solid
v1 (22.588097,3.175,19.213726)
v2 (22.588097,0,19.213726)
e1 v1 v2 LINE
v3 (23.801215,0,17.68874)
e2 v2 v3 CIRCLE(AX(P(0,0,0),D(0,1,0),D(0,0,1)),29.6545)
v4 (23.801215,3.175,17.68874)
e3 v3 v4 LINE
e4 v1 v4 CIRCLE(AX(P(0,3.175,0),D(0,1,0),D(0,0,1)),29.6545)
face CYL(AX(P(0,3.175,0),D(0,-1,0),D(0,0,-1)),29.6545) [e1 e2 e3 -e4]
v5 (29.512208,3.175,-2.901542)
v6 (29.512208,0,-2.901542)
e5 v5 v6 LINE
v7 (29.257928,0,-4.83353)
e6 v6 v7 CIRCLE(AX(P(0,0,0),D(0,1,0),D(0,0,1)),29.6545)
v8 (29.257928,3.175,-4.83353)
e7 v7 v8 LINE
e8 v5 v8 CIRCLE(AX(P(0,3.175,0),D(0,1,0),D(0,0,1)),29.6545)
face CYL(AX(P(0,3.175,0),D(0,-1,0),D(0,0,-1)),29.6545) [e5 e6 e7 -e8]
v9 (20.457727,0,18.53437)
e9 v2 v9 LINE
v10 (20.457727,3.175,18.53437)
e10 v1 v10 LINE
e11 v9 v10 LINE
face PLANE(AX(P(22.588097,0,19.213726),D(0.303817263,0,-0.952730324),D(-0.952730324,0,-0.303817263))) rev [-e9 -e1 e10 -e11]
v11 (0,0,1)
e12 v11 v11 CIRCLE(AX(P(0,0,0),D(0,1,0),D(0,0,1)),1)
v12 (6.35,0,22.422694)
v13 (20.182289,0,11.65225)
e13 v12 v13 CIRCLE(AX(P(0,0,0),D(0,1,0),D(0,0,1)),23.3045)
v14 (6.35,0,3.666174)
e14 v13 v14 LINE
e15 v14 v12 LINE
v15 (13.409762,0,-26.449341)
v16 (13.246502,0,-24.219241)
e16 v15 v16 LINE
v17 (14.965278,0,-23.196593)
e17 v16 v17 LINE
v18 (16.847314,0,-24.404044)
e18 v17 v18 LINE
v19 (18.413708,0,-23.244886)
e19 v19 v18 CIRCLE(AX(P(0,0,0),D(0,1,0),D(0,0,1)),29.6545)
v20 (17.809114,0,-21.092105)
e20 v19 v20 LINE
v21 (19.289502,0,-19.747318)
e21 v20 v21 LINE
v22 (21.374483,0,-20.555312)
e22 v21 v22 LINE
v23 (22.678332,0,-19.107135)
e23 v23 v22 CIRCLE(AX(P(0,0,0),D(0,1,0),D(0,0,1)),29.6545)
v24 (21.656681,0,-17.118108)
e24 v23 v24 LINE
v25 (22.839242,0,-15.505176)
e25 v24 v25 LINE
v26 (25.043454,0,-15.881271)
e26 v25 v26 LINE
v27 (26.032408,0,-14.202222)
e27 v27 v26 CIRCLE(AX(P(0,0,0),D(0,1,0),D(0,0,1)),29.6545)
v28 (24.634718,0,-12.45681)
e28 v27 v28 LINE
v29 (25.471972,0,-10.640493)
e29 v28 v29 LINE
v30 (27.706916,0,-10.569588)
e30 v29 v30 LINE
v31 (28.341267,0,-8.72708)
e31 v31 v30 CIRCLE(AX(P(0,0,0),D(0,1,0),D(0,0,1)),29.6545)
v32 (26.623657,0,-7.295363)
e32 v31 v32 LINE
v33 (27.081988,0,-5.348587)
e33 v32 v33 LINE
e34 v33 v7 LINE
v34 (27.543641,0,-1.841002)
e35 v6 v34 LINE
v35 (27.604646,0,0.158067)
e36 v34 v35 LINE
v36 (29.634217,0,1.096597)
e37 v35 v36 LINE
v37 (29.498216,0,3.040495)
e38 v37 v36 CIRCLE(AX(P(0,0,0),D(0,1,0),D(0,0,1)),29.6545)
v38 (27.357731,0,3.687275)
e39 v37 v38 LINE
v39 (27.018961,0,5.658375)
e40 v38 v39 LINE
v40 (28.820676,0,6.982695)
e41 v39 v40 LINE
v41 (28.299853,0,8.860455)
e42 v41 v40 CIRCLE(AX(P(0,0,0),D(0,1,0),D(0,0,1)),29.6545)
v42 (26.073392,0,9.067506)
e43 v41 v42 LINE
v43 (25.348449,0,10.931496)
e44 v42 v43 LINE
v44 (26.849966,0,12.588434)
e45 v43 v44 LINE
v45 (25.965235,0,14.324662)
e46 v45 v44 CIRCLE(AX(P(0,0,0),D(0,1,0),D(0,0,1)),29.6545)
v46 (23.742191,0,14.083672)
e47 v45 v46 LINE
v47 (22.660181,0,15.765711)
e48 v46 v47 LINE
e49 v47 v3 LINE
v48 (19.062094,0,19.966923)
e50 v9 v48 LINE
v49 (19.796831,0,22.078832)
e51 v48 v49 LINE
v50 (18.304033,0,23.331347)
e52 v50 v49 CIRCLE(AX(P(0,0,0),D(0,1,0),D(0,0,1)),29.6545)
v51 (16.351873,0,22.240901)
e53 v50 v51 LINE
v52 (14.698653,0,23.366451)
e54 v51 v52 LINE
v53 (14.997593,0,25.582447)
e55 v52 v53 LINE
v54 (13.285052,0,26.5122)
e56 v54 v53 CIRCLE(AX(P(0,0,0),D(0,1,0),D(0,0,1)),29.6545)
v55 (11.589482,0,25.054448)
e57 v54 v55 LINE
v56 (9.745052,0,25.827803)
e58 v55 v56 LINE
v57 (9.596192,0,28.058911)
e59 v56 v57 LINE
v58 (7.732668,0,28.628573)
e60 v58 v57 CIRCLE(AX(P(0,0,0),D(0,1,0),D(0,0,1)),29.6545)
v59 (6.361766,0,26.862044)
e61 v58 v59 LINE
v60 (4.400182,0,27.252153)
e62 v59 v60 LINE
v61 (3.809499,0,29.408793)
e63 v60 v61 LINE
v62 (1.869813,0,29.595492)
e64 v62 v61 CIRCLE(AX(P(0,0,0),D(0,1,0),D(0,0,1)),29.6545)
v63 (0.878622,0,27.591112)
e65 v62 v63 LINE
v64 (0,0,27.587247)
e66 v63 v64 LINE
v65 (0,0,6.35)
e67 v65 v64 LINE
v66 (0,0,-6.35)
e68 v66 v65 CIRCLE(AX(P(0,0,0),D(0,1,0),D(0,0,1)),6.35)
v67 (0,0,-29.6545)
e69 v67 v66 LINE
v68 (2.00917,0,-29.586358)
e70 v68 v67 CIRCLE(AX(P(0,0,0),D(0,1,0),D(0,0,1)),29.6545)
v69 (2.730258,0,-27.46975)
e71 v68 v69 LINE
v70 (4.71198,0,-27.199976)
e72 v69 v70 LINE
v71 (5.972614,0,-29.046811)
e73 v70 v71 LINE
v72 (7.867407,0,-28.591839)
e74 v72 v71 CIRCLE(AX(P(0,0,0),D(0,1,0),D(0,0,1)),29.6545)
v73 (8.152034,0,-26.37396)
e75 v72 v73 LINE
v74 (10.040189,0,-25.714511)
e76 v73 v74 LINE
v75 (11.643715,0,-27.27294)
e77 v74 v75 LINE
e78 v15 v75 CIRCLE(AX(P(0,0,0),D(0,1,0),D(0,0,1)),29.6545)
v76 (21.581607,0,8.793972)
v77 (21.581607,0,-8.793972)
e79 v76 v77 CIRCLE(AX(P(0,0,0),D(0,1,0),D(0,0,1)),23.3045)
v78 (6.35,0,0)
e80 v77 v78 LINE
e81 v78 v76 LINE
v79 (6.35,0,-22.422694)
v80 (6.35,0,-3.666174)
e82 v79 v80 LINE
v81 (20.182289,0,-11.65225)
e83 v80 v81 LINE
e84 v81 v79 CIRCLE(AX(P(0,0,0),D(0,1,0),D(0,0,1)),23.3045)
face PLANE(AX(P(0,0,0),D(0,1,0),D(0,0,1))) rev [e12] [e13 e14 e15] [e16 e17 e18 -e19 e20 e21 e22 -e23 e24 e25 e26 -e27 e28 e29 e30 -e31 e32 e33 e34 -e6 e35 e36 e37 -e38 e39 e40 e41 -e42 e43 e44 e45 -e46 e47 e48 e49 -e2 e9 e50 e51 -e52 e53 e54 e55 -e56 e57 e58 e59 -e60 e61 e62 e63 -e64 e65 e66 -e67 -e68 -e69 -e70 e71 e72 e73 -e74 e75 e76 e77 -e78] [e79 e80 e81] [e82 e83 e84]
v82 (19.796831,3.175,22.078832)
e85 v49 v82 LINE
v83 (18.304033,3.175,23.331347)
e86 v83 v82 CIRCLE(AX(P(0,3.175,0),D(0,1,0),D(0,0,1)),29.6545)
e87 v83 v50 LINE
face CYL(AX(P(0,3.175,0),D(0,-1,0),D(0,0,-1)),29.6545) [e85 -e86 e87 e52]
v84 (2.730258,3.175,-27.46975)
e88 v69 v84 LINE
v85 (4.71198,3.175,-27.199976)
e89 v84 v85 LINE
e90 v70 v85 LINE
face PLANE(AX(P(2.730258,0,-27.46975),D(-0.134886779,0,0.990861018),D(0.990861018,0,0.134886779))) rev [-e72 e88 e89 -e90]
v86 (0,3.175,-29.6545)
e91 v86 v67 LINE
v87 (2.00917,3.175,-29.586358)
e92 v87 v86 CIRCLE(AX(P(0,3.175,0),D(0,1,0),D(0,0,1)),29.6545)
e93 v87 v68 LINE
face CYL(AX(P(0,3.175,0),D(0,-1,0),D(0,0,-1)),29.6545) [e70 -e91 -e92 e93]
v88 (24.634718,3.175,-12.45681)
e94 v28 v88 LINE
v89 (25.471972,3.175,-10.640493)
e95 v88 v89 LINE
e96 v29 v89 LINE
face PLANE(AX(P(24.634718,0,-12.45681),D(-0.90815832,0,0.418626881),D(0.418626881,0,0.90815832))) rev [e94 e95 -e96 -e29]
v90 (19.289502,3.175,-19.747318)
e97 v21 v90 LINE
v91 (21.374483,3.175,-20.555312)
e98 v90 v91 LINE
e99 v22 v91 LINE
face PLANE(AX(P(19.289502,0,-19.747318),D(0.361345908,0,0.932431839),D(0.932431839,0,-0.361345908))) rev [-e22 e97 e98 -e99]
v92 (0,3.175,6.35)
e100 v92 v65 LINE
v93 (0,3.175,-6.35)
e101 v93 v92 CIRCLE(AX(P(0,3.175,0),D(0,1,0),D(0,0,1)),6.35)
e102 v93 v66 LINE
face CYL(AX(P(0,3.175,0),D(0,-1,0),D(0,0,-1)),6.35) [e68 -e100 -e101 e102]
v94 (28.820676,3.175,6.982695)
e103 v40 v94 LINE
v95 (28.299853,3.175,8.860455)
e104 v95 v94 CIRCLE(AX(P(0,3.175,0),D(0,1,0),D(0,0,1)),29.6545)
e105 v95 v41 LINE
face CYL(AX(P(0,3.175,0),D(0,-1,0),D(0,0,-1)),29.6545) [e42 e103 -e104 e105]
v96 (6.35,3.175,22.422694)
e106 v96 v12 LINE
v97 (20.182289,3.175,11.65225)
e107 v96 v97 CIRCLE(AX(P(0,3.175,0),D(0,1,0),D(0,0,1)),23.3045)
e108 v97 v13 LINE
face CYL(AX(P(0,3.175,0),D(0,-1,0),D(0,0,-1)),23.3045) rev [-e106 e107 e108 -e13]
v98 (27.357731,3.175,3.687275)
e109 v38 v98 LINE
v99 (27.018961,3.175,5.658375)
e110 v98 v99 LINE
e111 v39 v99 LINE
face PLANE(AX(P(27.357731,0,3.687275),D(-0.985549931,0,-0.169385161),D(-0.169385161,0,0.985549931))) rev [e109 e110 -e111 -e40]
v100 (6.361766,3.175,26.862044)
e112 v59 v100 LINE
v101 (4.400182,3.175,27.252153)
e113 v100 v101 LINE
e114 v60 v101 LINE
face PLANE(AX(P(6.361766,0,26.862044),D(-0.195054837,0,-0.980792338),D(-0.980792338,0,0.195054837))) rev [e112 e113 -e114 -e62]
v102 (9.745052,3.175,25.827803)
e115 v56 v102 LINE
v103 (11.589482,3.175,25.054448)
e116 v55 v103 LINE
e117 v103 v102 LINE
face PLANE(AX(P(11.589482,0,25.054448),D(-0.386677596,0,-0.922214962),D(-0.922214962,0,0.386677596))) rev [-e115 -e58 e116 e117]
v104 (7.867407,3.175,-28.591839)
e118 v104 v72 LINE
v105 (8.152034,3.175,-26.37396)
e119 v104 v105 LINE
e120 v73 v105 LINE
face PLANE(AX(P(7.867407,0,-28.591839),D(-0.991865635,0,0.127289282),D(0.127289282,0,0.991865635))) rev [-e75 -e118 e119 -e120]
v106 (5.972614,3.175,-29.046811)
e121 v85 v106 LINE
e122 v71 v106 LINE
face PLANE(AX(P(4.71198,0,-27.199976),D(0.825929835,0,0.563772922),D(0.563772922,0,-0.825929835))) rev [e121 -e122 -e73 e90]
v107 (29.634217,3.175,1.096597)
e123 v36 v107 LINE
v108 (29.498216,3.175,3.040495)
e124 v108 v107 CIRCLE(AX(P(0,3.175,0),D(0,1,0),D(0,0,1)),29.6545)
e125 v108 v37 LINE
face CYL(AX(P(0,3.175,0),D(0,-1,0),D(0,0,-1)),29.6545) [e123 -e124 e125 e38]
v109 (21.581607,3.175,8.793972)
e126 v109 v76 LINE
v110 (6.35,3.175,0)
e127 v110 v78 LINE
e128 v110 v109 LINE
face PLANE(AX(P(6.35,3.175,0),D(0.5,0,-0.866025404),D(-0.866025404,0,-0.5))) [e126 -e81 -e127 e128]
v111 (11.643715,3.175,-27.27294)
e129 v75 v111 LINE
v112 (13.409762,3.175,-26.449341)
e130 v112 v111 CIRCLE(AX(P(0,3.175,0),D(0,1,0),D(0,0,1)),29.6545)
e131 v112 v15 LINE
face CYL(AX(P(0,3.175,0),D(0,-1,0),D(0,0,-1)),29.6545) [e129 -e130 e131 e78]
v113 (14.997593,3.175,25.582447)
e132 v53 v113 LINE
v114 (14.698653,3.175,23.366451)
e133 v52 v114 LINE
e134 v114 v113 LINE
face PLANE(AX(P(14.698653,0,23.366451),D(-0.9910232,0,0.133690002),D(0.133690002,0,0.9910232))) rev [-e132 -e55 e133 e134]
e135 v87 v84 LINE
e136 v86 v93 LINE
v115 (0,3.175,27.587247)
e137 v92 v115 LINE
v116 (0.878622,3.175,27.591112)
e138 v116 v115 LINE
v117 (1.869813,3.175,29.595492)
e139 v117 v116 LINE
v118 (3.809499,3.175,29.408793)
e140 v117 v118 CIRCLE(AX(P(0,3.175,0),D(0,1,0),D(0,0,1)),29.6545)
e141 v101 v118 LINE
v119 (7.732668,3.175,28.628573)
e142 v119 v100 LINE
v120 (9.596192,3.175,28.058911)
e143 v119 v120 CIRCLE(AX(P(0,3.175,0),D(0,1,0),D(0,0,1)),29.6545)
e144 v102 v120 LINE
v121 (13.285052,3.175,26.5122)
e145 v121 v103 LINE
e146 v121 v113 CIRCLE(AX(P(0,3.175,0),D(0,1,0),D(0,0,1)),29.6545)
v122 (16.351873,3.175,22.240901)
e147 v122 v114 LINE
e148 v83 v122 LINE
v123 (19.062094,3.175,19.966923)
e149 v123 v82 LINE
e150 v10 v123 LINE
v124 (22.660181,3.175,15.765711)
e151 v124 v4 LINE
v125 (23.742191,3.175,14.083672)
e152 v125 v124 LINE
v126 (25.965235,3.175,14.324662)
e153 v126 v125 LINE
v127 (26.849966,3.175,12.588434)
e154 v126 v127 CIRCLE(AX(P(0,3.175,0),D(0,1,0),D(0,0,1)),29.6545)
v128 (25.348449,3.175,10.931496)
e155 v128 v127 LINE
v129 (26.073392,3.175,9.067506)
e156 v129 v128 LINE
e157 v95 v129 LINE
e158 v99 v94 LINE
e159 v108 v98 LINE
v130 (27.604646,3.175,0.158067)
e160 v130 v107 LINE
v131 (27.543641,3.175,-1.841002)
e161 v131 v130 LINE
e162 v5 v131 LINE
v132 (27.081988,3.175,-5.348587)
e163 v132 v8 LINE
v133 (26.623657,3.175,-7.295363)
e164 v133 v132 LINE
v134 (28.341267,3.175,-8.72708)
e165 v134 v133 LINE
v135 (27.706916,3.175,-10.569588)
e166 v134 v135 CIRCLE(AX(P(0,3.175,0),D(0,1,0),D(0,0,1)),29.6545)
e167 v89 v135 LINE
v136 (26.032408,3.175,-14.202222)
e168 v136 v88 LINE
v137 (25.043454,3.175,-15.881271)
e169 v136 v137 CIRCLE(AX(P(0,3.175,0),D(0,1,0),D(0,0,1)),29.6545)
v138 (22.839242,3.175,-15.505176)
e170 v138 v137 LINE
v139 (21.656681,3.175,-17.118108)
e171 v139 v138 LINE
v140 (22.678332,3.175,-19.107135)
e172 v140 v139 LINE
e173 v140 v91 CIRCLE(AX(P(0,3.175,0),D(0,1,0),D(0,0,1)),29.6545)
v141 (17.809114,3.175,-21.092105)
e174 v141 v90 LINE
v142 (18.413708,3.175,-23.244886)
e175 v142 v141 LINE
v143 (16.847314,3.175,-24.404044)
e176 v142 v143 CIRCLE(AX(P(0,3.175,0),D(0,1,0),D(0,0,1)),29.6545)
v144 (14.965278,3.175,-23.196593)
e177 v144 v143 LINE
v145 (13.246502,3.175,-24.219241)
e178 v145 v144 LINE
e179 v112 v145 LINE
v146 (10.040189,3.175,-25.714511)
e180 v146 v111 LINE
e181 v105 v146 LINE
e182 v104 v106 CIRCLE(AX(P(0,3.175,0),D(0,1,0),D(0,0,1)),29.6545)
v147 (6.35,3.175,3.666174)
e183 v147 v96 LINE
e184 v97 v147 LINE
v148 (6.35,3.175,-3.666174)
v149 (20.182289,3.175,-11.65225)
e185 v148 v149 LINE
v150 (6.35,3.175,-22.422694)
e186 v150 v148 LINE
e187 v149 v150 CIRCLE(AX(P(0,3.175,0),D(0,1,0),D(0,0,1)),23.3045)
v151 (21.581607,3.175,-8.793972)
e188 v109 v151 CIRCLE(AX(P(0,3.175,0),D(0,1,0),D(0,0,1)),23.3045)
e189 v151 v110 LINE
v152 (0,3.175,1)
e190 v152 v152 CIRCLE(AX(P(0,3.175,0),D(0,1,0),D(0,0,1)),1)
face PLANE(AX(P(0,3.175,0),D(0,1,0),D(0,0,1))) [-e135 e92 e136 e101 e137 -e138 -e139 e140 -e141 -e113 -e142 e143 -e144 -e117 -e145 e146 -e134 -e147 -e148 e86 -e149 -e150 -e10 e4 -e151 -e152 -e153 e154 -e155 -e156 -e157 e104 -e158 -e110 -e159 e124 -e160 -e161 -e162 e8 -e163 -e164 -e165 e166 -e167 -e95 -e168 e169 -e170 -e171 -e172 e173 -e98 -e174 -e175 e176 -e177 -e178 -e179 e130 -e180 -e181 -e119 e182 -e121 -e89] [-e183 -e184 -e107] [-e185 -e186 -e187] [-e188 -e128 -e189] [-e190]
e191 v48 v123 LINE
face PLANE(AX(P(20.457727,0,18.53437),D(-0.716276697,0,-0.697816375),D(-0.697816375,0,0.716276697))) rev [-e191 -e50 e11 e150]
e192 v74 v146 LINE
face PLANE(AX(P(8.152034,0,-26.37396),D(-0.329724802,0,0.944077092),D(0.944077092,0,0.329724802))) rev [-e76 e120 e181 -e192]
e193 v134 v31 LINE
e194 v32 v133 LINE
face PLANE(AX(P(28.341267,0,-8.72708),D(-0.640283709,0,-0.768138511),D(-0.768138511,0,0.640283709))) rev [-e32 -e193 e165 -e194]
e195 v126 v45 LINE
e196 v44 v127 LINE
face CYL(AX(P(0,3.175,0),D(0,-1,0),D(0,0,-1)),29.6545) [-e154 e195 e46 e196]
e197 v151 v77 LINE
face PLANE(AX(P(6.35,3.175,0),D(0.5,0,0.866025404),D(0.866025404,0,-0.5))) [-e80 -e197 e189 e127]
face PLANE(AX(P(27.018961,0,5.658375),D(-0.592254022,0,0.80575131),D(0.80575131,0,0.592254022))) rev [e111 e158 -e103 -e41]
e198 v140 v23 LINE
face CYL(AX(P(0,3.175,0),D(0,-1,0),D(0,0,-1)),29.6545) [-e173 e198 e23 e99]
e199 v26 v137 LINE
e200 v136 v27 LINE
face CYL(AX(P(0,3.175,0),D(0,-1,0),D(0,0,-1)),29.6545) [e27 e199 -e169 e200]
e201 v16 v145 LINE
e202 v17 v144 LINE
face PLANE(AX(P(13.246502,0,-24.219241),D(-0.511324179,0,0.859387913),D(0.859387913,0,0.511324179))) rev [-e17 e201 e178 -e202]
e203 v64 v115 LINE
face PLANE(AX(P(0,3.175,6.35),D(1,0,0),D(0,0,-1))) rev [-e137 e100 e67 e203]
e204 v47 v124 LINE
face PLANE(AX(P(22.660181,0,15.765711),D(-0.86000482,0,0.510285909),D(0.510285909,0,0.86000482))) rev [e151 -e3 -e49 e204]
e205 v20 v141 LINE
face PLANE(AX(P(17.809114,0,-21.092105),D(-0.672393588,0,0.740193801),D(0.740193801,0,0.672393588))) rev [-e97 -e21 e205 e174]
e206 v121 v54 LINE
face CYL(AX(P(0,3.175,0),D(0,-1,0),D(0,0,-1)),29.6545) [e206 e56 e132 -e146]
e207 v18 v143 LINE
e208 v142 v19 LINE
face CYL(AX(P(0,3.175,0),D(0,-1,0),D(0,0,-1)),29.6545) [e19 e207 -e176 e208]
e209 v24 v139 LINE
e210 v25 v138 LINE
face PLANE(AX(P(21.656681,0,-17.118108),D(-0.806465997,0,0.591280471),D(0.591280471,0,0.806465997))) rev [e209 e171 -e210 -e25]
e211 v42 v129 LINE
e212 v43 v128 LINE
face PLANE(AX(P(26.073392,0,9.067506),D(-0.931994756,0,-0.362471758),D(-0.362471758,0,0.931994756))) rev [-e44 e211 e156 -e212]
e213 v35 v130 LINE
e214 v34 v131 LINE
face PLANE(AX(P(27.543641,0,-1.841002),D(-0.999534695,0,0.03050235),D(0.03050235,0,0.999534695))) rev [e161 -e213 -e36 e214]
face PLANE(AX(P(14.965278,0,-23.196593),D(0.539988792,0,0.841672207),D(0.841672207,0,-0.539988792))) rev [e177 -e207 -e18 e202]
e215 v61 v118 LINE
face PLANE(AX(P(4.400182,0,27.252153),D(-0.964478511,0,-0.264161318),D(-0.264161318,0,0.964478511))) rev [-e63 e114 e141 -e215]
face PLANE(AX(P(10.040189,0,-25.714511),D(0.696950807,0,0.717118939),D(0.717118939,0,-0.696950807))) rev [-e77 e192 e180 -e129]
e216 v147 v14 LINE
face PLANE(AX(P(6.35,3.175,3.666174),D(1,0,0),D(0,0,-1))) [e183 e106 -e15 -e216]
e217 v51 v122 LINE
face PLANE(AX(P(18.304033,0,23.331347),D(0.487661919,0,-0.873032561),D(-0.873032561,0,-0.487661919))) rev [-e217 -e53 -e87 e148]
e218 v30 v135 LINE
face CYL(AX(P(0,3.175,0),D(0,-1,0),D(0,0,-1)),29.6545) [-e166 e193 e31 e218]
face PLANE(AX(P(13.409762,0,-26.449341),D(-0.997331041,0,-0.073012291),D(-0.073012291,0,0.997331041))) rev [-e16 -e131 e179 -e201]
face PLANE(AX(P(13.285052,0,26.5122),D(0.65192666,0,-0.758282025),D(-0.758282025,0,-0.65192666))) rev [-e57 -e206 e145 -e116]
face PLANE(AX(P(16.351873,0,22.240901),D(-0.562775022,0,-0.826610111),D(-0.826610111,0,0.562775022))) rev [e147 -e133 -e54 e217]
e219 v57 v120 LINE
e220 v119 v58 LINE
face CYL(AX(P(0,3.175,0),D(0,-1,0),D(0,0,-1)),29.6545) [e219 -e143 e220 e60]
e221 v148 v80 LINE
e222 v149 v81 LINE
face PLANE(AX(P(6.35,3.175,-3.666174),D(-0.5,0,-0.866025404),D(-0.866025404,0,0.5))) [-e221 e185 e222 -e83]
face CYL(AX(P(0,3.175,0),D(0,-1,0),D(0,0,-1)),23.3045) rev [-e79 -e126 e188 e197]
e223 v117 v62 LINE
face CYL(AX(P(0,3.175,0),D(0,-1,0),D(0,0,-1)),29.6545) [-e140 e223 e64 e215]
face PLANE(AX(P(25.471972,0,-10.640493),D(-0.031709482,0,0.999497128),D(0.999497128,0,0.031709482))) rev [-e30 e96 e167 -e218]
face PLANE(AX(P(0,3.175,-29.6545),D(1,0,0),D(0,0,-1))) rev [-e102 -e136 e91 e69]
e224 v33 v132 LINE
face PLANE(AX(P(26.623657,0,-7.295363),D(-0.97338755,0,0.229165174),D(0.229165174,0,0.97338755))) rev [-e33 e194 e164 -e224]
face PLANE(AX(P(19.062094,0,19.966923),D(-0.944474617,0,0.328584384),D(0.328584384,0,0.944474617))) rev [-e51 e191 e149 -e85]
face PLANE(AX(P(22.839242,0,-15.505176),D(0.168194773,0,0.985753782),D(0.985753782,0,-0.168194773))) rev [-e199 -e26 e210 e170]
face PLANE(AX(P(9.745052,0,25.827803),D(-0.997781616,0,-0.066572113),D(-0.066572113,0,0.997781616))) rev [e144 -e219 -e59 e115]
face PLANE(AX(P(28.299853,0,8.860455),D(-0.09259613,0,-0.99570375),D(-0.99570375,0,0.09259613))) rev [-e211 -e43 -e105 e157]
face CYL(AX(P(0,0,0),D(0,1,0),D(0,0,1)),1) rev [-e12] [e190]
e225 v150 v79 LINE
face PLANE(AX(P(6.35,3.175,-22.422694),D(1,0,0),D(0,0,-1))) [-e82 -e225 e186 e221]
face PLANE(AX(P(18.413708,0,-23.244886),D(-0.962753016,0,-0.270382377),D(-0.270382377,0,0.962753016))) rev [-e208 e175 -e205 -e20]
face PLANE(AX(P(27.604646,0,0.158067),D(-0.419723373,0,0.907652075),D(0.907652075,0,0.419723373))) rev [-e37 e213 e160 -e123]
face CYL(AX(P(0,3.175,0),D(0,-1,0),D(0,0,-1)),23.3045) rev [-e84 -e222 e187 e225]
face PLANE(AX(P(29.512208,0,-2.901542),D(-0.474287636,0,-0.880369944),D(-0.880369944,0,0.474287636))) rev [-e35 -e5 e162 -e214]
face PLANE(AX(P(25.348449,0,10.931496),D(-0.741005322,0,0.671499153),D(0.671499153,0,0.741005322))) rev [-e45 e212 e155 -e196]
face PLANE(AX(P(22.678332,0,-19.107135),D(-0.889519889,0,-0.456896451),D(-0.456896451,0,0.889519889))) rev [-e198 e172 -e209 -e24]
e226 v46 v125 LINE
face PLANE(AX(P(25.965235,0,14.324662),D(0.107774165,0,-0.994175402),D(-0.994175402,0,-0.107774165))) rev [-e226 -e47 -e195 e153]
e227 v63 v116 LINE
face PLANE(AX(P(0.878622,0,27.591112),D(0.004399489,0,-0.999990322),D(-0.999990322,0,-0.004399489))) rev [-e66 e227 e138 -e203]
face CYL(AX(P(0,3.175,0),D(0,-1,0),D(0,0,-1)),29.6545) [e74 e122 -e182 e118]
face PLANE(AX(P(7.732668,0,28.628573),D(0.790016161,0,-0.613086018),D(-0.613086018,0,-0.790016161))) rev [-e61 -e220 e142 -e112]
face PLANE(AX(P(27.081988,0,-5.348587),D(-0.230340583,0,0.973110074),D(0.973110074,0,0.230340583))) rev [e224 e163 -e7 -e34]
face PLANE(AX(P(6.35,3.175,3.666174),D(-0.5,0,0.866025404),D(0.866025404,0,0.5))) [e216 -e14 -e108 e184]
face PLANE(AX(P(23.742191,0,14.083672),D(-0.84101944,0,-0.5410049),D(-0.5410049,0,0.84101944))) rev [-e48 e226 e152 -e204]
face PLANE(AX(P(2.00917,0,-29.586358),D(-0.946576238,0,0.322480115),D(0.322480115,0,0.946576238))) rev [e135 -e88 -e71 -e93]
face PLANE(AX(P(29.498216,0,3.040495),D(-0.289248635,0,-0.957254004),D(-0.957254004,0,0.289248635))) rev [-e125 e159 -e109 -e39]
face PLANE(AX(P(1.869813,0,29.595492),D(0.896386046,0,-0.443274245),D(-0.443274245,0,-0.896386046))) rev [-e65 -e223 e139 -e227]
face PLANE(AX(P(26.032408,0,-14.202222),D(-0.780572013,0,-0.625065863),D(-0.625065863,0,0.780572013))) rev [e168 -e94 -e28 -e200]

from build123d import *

# Parameters (mm, degrees)
BOSS_EXTRUDE1_DEPTH = 3.175
CUT_EXTRUDE1_DEPTH  = 3.175
CIRPATTERN1_DEPTH   = 3.175
SKETCH3_R           = 1
CUT_EXTRUDE2_DEPTH  = 3.175


# Read off the part's stored shape, not the designer's step: CirPattern1
with BuildPart() as part:
    # Sketch1 → Boss-Extrude1 (new body)
    with BuildSketch(Plane(origin=(0, 0, 0), x_dir=(1, 0, 0), z_dir=(0, 1, 0))):
        with BuildLine():
            Line((0, 29.6545), (0, 6.35))
            ThreePointArc((0, 6.35), (-6.35, 0), (0, -6.35))
            Line((0, -6.35), (0, -29.6545))
            ThreePointArc((0, -29.6545), (29.6545, 0), (0, 29.6545))
        make_face()
        with BuildLine():
            Line((6.35, 22.422694313), (6.35, 3.666174209))
            Line((6.35, 3.666174209), (20.182289022, 11.65225))
            ThreePointArc((20.182289022, 11.65225), (14.317514025, 18.387727222), (6.35, 22.422694313))
        make_face(mode=Mode.SUBTRACT)
        with BuildLine():
            Line((6.35, 0), (21.581607168, -8.793972499))
            ThreePointArc((21.581607168, -8.793972499), (23.3045, 0), (21.581607168, 8.793972499))
            Line((21.581607168, 8.793972499), (6.35, 0))
        make_face(mode=Mode.SUBTRACT)
        with BuildLine():
            Line((6.35, -3.666174209), (20.182289022, -11.65225))
            ThreePointArc((20.182289022, -11.65225), (14.317514025, -18.387727222), (6.35, -22.422694313))
            Line((6.35, -22.422694313), (6.35, -3.666174209))
        make_face(mode=Mode.SUBTRACT)
    extrude(amount=BOSS_EXTRUDE1_DEPTH)

    # Sketch2 → Cut-Extrude1 (cut)
    with BuildSketch(Plane(origin=(0, 3.175, 0), x_dir=(1, 0, 0), z_dir=(0, 1, 0))):
        Polygon((2.009170374, 29.586358422), (2.730257833, 27.469749607), (4.711979869, 27.199976048), (5.972614446, 29.046811304), align=None)
    extrude(amount=-CUT_EXTRUDE1_DEPTH, mode=Mode.SUBTRACT)


with BuildPart() as body_2:
    # of the pieces the cut leaves, the one that is kept (cut_extrude1_keep)
    add(part.part.solids().sort_by_distance((0, 0, -29.6545))[0])

    # CirPattern1 outline → CirPattern1 (cut)
    with BuildSketch(Plane(origin=(0, 0, 0), x_dir=(1, 0, 0), z_dir=(0, 1, 0))):
        with BuildLine():
            ThreePointArc((11.643715218, 27.272940182), (9.777824138, 27.996134115), (7.867406851, 28.59183939))
            Line((7.867406851, 28.59183939), (8.152034339, 26.373960405))
            Line((8.152034339, 26.373960405), (10.040188522, 25.714510801))
            Line((10.040188522, 25.714510801), (11.643715218, 27.272940182))
        make_face()
        with BuildLine():
            ThreePointArc((0, -29.6545), (0.935371957, -29.639744425), (1.869813063, -29.595492382))
            Line((1.869813063, -29.595492382), (0.878621718, -27.591112249))
            Line((0.878621718, -27.591112249), (0, -27.587246726))
            Line((0, -27.587246726), (0, -29.6545))
        make_face()
        with BuildLine():
            ThreePointArc((3.809498846, -29.408792712), (5.784253675, -29.084906389), (7.732668198, -28.628573363))
            Line((7.732668198, -28.628573363), (6.361766185, -26.862043524))
            Line((6.361766185, -26.862043524), (4.400181509, -27.252153199))
            Line((4.400181509, -27.252153199), (3.809498846, -29.408792712))
        make_face()
        with BuildLine():
            ThreePointArc((9.596192288, -28.058910596), (11.466730783, -27.347823595), (13.285052137, -26.51220021))
            Line((13.285052137, -26.51220021), (11.589481982, -25.054447882))
            Line((11.589481982, -25.054447882), (9.745052057, -25.827803075))
            Line((9.745052057, -25.827803075), (9.596192288, -28.058910596))
        make_face()
        with BuildLine():
            ThreePointArc((14.997592941, -25.582446643), (16.688811877, -24.512709528), (18.304033384, -23.331346556))
            Line((18.304033384, -23.331346556), (16.35187323, -22.240901357))
            Line((16.35187323, -22.240901357), (14.698653008, -23.3664514))
            Line((14.698653008, -23.3664514), (14.997592941, -25.582446643))
        make_face()
        with BuildLine():
            ThreePointArc((19.796831377, -22.078832344), (21.240827314, -20.693395692), (22.588096877, -19.213725556))
            Line((22.588096877, -19.213725556), (20.457727108, -18.534369503))
            Line((20.457727108, -18.534369503), (19.062094358, -19.966922897))
            Line((19.062094358, -19.966922897), (19.796831377, -22.078832344))
        make_face()
        with BuildLine():
            ThreePointArc((23.801215338, -17.688739883), (24.940010987, -16.043229793), (25.965234936, -14.324662123))
            Line((25.965234936, -14.324662123), (23.742191157, -14.083671764))
            Line((23.742191157, -14.083671764), (22.660181358, -15.765710644))
            Line((22.660181358, -15.765710644), (23.801215338, -17.688739883))
        make_face()
        with BuildLine():
            ThreePointArc((26.849966443, -12.588434067), (27.637838485, -10.748918742), (28.299853474, -8.860455044))
            Line((28.299853474, -8.860455044), (26.073392205, -9.067506284))
            Line((26.073392205, -9.067506284), (25.348448689, -10.931495795))
            Line((25.348448689, -10.931495795), (26.849966443, -12.588434067))
        make_face()
        with BuildLine():
            ThreePointArc((28.820675533, -6.982695186), (29.22599044, -5.023032253), (29.498216176, -3.04049546))
            Line((29.498216176, -3.04049546), (27.357731153, -3.68727507))
            Line((27.357731153, -3.68727507), (27.018960831, -5.658374932))
            Line((27.018960831, -5.658374932), (28.820675533, -6.982695186))
        make_face()
        with BuildLine():
            ThreePointArc((29.634217474, -1.096596968), (29.640701614, 0.904531949), (29.512208073, 2.901541813))
            Line((29.512208073, 2.901541813), (27.543641034, 1.841002417))
            Line((27.543641034, 1.841002417), (27.604645734, -0.158066973))
            Line((27.604645734, -0.158066973), (29.634217474, -1.096596968))
        make_face()
        with BuildLine():
            ThreePointArc((29.257928078, 4.833530266), (28.865321108, 6.795778658), (28.341267381, 8.727080467))
            Line((28.341267381, 8.727080467), (26.623657455, 7.295362569))
            Line((26.623657455, 7.295362569), (27.081987803, 5.348587468))
            Line((27.081987803, 5.348587468), (29.257928078, 4.833530266))
        make_face()
        with BuildLine():
            ThreePointArc((27.706915584, 10.569588405), (26.930980906, 12.41417084), (26.03240806, 14.202221686))
            Line((26.03240806, 14.202221686), (24.634718301, 12.456809604))
            Line((24.634718301, 12.456809604), (25.471972063, 10.640492963))
            Line((25.471972063, 10.640492963), (27.706915584, 10.569588405))
        make_face()
        with BuildLine():
            ThreePointArc((25.043454062, 15.881271325), (23.915345912, 17.534126729), (22.678332178, 19.107135313))
            Line((22.678332178, 19.107135313), (21.656680655, 17.118108374))
            Line((21.656680655, 17.118108374), (22.839241597, 15.50517638))
            Line((22.839241597, 15.50517638), (25.043454062, 15.881271325))
        make_face()
        with BuildLine():
            ThreePointArc((21.374483065, 20.555311819), (19.939495651, 21.950077071), (18.413707861, 23.24488617))
            Line((18.413707861, 23.24488617), (17.809114486, 21.092104981))
            Line((17.809114486, 21.092104981), (19.289502088, 19.747317805))
            Line((19.289502088, 19.747317805), (21.374483065, 20.555311819))
        make_face()
        with BuildLine():
            ThreePointArc((16.847313945, 24.4040444), (15.16306286, 25.484718851), (13.409762295, 26.449341116))
            Line((13.409762295, 26.449341116), (13.24650185, 24.219241112))
            Line((13.24650185, 24.219241112), (14.965277675, 23.196592754))
            Line((14.965277675, 23.196592754), (16.847313945, 24.4040444))
        make_face()
    extrude(amount=CIRPATTERN1_DEPTH, mode=Mode.SUBTRACT)

    # Sketch3 → Cut-Extrude2 (cut)
    with BuildSketch(Plane(origin=(0, 3.175, 0), x_dir=(1, 0, 0), z_dir=(0, 1, 0))):
        with Locations(Location((0, 0, 0), (0, 0, 270))):
            Circle(SKETCH3_R)
    extrude(amount=-CUT_EXTRUDE2_DEPTH, mode=Mode.SUBTRACT)


solid = body_2.part
